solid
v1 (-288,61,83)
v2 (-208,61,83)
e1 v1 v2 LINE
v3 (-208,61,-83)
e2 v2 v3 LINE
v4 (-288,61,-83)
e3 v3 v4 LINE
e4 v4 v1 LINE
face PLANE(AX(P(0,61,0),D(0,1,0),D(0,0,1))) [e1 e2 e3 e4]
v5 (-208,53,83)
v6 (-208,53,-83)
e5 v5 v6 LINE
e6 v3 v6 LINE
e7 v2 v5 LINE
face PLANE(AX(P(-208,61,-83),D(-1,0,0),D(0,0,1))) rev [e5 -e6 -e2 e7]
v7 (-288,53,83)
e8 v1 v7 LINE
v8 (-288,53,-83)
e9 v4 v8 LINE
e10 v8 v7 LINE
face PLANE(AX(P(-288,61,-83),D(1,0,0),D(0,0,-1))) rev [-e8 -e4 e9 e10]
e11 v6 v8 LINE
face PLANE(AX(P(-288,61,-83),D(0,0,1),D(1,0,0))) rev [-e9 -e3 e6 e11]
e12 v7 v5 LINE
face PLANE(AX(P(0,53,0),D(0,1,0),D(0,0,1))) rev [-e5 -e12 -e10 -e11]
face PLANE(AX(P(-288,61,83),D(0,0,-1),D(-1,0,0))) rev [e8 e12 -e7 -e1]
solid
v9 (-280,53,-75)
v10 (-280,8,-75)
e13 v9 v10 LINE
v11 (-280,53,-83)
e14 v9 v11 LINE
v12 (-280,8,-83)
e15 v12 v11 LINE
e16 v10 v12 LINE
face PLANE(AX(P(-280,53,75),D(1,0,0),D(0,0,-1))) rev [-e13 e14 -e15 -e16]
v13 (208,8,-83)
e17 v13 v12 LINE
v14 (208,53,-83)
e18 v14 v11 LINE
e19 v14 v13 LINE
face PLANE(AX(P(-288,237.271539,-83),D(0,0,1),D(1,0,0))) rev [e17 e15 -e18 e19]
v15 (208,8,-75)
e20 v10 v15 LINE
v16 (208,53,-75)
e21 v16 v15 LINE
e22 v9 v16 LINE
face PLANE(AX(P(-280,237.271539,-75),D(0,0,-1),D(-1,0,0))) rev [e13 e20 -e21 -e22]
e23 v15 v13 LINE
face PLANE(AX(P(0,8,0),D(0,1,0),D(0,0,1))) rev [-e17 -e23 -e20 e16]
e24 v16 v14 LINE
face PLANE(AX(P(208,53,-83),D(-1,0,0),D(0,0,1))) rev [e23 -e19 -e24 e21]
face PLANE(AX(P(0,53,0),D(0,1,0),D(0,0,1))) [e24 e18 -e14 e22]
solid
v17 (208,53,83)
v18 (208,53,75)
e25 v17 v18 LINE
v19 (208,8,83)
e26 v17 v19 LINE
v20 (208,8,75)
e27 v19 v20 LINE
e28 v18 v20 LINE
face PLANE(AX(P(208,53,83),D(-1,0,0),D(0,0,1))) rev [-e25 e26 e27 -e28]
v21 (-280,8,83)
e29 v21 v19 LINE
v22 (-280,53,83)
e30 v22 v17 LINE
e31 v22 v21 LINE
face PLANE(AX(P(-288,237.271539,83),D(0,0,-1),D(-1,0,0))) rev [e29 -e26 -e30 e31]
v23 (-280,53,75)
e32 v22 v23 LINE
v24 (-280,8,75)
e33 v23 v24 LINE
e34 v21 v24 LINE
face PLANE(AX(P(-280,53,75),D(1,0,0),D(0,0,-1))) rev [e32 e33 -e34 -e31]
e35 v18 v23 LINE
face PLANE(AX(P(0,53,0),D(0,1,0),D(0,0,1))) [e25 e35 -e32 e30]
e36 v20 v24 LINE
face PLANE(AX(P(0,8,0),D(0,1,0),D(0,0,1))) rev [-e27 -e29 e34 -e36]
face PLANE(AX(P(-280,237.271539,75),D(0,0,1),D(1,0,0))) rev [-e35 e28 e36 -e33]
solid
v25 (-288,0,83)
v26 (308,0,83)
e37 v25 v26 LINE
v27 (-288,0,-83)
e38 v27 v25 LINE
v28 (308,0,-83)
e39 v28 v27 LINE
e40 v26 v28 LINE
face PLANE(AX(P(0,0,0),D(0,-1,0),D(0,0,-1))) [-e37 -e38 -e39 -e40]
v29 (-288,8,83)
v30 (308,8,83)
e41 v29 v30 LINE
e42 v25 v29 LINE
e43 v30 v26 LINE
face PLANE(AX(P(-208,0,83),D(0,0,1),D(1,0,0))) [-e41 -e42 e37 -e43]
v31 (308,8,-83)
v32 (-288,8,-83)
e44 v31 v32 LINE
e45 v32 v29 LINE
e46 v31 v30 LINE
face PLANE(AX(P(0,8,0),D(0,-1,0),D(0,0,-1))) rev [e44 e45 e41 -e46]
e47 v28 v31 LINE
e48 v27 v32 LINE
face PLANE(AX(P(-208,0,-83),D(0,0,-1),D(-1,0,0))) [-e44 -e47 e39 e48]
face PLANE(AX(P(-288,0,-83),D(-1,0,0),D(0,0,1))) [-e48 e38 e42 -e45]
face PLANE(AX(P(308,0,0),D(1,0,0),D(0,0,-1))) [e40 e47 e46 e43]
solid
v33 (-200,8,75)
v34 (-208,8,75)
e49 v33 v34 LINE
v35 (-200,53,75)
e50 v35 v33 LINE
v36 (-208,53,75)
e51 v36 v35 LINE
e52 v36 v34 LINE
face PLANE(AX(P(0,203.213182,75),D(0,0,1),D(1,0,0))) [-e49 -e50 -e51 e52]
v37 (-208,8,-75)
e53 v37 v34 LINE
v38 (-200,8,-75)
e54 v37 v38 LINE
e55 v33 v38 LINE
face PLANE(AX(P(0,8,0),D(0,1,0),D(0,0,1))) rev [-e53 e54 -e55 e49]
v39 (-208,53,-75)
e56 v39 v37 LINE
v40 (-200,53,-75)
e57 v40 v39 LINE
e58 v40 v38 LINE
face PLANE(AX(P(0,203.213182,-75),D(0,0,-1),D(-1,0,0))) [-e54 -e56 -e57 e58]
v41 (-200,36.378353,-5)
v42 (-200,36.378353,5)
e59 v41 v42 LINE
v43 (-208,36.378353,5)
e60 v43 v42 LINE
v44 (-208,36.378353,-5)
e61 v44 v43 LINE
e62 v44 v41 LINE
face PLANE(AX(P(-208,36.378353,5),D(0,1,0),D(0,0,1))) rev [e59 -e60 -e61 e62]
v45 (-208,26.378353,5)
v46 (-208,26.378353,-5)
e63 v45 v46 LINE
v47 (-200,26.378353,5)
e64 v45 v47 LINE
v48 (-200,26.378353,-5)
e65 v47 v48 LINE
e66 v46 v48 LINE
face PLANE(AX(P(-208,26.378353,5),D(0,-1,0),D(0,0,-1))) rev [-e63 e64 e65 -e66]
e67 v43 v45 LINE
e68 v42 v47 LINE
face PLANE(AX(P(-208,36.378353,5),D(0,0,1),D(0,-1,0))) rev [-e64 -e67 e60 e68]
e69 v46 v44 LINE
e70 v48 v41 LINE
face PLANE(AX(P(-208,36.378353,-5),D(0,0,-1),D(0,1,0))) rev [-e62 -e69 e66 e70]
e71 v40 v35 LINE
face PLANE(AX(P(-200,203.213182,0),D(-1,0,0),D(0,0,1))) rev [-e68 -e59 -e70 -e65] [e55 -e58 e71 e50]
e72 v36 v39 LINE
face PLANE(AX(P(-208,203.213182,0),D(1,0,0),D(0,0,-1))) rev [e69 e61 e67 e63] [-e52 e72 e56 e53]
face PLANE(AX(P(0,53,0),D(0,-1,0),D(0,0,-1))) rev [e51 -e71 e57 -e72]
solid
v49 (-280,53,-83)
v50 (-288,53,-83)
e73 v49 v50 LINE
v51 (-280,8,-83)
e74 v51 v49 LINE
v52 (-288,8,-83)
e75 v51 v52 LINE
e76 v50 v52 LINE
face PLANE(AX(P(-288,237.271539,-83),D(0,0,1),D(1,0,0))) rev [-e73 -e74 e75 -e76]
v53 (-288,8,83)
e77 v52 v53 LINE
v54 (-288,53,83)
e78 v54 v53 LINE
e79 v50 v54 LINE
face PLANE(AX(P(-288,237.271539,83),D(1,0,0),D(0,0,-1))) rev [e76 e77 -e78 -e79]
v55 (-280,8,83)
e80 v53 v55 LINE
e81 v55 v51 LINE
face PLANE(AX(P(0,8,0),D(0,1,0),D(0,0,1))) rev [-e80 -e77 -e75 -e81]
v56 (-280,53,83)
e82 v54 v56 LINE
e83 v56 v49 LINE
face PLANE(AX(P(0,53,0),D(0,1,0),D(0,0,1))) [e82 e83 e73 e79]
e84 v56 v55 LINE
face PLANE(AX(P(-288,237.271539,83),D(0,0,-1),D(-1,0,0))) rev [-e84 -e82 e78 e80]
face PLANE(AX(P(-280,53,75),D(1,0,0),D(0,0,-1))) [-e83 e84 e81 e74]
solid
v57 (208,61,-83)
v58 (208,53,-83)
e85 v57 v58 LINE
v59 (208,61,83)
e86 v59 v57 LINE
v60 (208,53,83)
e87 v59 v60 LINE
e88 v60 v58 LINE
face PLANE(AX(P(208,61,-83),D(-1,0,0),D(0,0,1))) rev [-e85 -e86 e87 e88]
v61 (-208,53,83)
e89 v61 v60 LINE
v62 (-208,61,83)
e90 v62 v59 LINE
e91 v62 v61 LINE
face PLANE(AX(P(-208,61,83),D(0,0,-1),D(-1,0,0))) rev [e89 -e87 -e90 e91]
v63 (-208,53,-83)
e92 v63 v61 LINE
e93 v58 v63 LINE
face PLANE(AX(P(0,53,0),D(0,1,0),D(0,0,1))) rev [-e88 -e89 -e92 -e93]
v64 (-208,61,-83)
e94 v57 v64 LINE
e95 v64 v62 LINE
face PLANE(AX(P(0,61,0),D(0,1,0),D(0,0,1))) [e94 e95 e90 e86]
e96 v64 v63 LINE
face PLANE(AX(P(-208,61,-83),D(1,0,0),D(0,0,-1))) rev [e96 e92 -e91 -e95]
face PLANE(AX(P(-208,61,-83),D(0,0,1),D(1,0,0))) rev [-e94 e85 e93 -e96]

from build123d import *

# Parameters (mm, degrees)
SKETCH2_W             = 416
SKETCH2_H             = 166
BOSS_EXTRUDE1_DEPTH   = 8
SKETCH6_W             = 80
SKETCH6_H             = 166
BOSS_EXTRUDE5_DEPTH   = 8
SKETCH3_W             = 416
SKETCH3_H             = 8
BOSS_EXTRUDE2_DEPTH   = 45
BOSS_EXTRUDE2_2_DEPTH = 45
SKETCH4_W             = 8
SKETCH4_H             = 150
BOSS_EXTRUDE3_DEPTH   = 45
SKETCH7_W             = 166
SKETCH7_H             = 8
BOSS_EXTRUDE7_DEPTH   = 100
BOSS_EXTRUDE8_DEPTH   = 45
SPLIT2_START          = -288
SPLIT2_OUTLINE_W      = 45
SPLIT2_OUTLINE_H      = 166
SPLIT2_DEPTH          = 8
SPLIT2_2_OUTLINE_W    = 45
SPLIT2_2_OUTLINE_H    = 166
SPLIT2_2_DEPTH        = 8
SPLIT2_START_2        = -280
SPLIT2_3_OUTLINE_W    = 45
SPLIT2_3_OUTLINE_H    = 8
SPLIT2_3_DEPTH        = 72
SPLIT2_4_OUTLINE_W    = 45
SPLIT2_4_OUTLINE_H    = 8
SPLIT2_4_DEPTH        = 72
SKETCH9_W             = 80
SKETCH9_H             = 166
BOSS_EXTRUDE9_DEPTH   = 8
SKETCH11_W            = 416
SKETCH11_H            = 166
BOSS_EXTRUDE10_DEPTH  = 8
SKETCH12_W            = 10
SKETCH12_H            = 10
CUT_EXTRUDE1_DEPTH    = 8


with BuildPart() as part:
    # Sketch2 → Boss-Extrude1 (new body)
    with BuildSketch(Plane(origin=(0, 0, 0), x_dir=(1, 0, 0), z_dir=(0, 1, 0))):
        Rectangle(SKETCH2_W, SKETCH2_H)
    extrude(amount=BOSS_EXTRUDE1_DEPTH)


with BuildPart() as body_2:
    # Sketch6 → Boss-Extrude5 (new body)
    with BuildSketch(Plane(origin=(0, 8, 0), x_dir=(1, 0, 0), z_dir=(0, 1, 0))):
        with Locations((-248, 0)):
            Rectangle(SKETCH6_W, SKETCH6_H)
    extrude(amount=-BOSS_EXTRUDE5_DEPTH)


with BuildPart() as body_3:
    # Sketch3 → Boss-Extrude2 (new body)
    with BuildSketch(Plane(origin=(0, 8, 0), x_dir=(1, 0, 0), z_dir=(0, 1, 0))):
        with Locations((0, 79)):
            Rectangle(SKETCH3_W, SKETCH3_H)
    extrude(amount=BOSS_EXTRUDE2_DEPTH)


with BuildPart() as body_4:
    # Sketch3 → Boss-Extrude2 2 (new body)
    with BuildSketch(Plane(origin=(0, 8, 0), x_dir=(1, 0, 0), z_dir=(0, 1, 0))):
        with Locations((0, -79)):
            Rectangle(SKETCH3_W, SKETCH3_H)
    extrude(amount=BOSS_EXTRUDE2_2_DEPTH)


with BuildPart() as body_5:
    # Sketch4 → Boss-Extrude3 (new body)
    with BuildSketch(Plane(origin=(0, 8, 0), x_dir=(1, 0, 0), z_dir=(0, 1, 0))):
        with Locations((-204, 0)):
            Rectangle(SKETCH4_W, SKETCH4_H)
    extrude(amount=BOSS_EXTRUDE3_DEPTH)

    # Sketch12 → Cut-Extrude1 (cut)
    with BuildSketch(Plane(origin=(-200, 0, 0), x_dir=(0, 0, -1), z_dir=(1, 0, 0))):
        with Locations((0, 31.378353454)):
            Rectangle(SKETCH12_W, SKETCH12_H)
    extrude(amount=-CUT_EXTRUDE1_DEPTH, mode=Mode.SUBTRACT)


with BuildPart() as body_6:
    # Sketch7 → Boss-Extrude7 (new body)
    with BuildSketch(Plane(origin=(208, 0, 0), x_dir=(0, 0, -1), z_dir=(1, 0, 0))):
        with Locations((0, 4)):
            Rectangle(SKETCH7_W, SKETCH7_H)
    extrude(amount=BOSS_EXTRUDE7_DEPTH)

    # Combine1: union part
    add(part.part)


with BuildPart() as body_2_1:
    add(body_2.part)

    # Combine2: union body 6
    add(body_6.part)


with BuildPart() as body_5_2:
    # Sketch8 → Boss-Extrude8 (new body)
    with BuildSketch(Plane(origin=(0, 8, 0), x_dir=(1, 0, 0), z_dir=(0, 1, 0))):
        Polygon((-288, 83), (-208, 83), (-208, 75), (-280, 75), (-280, -75), (-208, -75), (-208, -83), (-288, -83), (-288, -75), (-288, 75), align=None)
    extrude(amount=BOSS_EXTRUDE8_DEPTH)

    # Split2 2 outline → Split2 2 (cut)
    with BuildSketch(Plane.YZ.offset(SPLIT2_START)):
        with Locations((30.5, 0)):
            Rectangle(SPLIT2_2_OUTLINE_W, SPLIT2_2_OUTLINE_H)
    extrude(amount=SPLIT2_2_DEPTH, mode=Mode.SUBTRACT)

    # Split2 3 outline → Split2 3 (cut)
    with BuildSketch(Plane.YZ.offset(SPLIT2_START_2)):
        with Locations((30.5, 79)):
            Rectangle(SPLIT2_3_OUTLINE_W, SPLIT2_3_OUTLINE_H)
    extrude(amount=SPLIT2_3_DEPTH, mode=Mode.SUBTRACT)


with BuildPart() as body_6_2:
    # Split2: read off the stored shape, not the designer's step
    # Split2 outline → Split2 (new body)
    with BuildSketch(Plane.YZ.offset(SPLIT2_START)):
        with Locations((30.5, 0)):
            Rectangle(SPLIT2_OUTLINE_W, SPLIT2_OUTLINE_H)
    extrude(amount=SPLIT2_DEPTH)


with BuildPart() as body_7:
    # Split2 4 outline → Split2 4 (new body)
    with BuildSketch(Plane.YZ.offset(SPLIT2_START_2)):
        with Locations((30.5, 79)):
            Rectangle(SPLIT2_4_OUTLINE_W, SPLIT2_4_OUTLINE_H)
    extrude(amount=SPLIT2_4_DEPTH)


with BuildPart() as body_4_1:
    add(body_4.part)

    # Combine3: read off the stored shape, not the designer's step
    # Combine3: union body 7
    add(body_7.part)


with BuildPart() as body_3_1:
    add(body_3.part)

    # Combine4: read off the stored shape, not the designer's step
    # Combine4: union body 5 2
    add(body_5_2.part)


with BuildPart() as body_6_3:
    # Sketch9 → Boss-Extrude9 (new body)
    with BuildSketch(Plane(origin=(0, 53, 0), x_dir=(1, 0, 0), z_dir=(0, 1, 0))):
        with Locations((-248, 0)):
            Rectangle(SKETCH9_W, SKETCH9_H)
    extrude(amount=BOSS_EXTRUDE9_DEPTH)


with BuildPart() as body_7_2:
    # Sketch11 → Boss-Extrude10 (new body)
    with BuildSketch(Plane(origin=(0, 53, 0), x_dir=(1, 0, 0), z_dir=(0, 1, 0))):
        Rectangle(SKETCH11_W, SKETCH11_H)
    extrude(amount=BOSS_EXTRUDE10_DEPTH)


solid = Compound([body_5.part, body_2_1.part, body_6_2.part, body_4_1.part, body_3_1.part, body_6_3.part, body_7_2.part])
